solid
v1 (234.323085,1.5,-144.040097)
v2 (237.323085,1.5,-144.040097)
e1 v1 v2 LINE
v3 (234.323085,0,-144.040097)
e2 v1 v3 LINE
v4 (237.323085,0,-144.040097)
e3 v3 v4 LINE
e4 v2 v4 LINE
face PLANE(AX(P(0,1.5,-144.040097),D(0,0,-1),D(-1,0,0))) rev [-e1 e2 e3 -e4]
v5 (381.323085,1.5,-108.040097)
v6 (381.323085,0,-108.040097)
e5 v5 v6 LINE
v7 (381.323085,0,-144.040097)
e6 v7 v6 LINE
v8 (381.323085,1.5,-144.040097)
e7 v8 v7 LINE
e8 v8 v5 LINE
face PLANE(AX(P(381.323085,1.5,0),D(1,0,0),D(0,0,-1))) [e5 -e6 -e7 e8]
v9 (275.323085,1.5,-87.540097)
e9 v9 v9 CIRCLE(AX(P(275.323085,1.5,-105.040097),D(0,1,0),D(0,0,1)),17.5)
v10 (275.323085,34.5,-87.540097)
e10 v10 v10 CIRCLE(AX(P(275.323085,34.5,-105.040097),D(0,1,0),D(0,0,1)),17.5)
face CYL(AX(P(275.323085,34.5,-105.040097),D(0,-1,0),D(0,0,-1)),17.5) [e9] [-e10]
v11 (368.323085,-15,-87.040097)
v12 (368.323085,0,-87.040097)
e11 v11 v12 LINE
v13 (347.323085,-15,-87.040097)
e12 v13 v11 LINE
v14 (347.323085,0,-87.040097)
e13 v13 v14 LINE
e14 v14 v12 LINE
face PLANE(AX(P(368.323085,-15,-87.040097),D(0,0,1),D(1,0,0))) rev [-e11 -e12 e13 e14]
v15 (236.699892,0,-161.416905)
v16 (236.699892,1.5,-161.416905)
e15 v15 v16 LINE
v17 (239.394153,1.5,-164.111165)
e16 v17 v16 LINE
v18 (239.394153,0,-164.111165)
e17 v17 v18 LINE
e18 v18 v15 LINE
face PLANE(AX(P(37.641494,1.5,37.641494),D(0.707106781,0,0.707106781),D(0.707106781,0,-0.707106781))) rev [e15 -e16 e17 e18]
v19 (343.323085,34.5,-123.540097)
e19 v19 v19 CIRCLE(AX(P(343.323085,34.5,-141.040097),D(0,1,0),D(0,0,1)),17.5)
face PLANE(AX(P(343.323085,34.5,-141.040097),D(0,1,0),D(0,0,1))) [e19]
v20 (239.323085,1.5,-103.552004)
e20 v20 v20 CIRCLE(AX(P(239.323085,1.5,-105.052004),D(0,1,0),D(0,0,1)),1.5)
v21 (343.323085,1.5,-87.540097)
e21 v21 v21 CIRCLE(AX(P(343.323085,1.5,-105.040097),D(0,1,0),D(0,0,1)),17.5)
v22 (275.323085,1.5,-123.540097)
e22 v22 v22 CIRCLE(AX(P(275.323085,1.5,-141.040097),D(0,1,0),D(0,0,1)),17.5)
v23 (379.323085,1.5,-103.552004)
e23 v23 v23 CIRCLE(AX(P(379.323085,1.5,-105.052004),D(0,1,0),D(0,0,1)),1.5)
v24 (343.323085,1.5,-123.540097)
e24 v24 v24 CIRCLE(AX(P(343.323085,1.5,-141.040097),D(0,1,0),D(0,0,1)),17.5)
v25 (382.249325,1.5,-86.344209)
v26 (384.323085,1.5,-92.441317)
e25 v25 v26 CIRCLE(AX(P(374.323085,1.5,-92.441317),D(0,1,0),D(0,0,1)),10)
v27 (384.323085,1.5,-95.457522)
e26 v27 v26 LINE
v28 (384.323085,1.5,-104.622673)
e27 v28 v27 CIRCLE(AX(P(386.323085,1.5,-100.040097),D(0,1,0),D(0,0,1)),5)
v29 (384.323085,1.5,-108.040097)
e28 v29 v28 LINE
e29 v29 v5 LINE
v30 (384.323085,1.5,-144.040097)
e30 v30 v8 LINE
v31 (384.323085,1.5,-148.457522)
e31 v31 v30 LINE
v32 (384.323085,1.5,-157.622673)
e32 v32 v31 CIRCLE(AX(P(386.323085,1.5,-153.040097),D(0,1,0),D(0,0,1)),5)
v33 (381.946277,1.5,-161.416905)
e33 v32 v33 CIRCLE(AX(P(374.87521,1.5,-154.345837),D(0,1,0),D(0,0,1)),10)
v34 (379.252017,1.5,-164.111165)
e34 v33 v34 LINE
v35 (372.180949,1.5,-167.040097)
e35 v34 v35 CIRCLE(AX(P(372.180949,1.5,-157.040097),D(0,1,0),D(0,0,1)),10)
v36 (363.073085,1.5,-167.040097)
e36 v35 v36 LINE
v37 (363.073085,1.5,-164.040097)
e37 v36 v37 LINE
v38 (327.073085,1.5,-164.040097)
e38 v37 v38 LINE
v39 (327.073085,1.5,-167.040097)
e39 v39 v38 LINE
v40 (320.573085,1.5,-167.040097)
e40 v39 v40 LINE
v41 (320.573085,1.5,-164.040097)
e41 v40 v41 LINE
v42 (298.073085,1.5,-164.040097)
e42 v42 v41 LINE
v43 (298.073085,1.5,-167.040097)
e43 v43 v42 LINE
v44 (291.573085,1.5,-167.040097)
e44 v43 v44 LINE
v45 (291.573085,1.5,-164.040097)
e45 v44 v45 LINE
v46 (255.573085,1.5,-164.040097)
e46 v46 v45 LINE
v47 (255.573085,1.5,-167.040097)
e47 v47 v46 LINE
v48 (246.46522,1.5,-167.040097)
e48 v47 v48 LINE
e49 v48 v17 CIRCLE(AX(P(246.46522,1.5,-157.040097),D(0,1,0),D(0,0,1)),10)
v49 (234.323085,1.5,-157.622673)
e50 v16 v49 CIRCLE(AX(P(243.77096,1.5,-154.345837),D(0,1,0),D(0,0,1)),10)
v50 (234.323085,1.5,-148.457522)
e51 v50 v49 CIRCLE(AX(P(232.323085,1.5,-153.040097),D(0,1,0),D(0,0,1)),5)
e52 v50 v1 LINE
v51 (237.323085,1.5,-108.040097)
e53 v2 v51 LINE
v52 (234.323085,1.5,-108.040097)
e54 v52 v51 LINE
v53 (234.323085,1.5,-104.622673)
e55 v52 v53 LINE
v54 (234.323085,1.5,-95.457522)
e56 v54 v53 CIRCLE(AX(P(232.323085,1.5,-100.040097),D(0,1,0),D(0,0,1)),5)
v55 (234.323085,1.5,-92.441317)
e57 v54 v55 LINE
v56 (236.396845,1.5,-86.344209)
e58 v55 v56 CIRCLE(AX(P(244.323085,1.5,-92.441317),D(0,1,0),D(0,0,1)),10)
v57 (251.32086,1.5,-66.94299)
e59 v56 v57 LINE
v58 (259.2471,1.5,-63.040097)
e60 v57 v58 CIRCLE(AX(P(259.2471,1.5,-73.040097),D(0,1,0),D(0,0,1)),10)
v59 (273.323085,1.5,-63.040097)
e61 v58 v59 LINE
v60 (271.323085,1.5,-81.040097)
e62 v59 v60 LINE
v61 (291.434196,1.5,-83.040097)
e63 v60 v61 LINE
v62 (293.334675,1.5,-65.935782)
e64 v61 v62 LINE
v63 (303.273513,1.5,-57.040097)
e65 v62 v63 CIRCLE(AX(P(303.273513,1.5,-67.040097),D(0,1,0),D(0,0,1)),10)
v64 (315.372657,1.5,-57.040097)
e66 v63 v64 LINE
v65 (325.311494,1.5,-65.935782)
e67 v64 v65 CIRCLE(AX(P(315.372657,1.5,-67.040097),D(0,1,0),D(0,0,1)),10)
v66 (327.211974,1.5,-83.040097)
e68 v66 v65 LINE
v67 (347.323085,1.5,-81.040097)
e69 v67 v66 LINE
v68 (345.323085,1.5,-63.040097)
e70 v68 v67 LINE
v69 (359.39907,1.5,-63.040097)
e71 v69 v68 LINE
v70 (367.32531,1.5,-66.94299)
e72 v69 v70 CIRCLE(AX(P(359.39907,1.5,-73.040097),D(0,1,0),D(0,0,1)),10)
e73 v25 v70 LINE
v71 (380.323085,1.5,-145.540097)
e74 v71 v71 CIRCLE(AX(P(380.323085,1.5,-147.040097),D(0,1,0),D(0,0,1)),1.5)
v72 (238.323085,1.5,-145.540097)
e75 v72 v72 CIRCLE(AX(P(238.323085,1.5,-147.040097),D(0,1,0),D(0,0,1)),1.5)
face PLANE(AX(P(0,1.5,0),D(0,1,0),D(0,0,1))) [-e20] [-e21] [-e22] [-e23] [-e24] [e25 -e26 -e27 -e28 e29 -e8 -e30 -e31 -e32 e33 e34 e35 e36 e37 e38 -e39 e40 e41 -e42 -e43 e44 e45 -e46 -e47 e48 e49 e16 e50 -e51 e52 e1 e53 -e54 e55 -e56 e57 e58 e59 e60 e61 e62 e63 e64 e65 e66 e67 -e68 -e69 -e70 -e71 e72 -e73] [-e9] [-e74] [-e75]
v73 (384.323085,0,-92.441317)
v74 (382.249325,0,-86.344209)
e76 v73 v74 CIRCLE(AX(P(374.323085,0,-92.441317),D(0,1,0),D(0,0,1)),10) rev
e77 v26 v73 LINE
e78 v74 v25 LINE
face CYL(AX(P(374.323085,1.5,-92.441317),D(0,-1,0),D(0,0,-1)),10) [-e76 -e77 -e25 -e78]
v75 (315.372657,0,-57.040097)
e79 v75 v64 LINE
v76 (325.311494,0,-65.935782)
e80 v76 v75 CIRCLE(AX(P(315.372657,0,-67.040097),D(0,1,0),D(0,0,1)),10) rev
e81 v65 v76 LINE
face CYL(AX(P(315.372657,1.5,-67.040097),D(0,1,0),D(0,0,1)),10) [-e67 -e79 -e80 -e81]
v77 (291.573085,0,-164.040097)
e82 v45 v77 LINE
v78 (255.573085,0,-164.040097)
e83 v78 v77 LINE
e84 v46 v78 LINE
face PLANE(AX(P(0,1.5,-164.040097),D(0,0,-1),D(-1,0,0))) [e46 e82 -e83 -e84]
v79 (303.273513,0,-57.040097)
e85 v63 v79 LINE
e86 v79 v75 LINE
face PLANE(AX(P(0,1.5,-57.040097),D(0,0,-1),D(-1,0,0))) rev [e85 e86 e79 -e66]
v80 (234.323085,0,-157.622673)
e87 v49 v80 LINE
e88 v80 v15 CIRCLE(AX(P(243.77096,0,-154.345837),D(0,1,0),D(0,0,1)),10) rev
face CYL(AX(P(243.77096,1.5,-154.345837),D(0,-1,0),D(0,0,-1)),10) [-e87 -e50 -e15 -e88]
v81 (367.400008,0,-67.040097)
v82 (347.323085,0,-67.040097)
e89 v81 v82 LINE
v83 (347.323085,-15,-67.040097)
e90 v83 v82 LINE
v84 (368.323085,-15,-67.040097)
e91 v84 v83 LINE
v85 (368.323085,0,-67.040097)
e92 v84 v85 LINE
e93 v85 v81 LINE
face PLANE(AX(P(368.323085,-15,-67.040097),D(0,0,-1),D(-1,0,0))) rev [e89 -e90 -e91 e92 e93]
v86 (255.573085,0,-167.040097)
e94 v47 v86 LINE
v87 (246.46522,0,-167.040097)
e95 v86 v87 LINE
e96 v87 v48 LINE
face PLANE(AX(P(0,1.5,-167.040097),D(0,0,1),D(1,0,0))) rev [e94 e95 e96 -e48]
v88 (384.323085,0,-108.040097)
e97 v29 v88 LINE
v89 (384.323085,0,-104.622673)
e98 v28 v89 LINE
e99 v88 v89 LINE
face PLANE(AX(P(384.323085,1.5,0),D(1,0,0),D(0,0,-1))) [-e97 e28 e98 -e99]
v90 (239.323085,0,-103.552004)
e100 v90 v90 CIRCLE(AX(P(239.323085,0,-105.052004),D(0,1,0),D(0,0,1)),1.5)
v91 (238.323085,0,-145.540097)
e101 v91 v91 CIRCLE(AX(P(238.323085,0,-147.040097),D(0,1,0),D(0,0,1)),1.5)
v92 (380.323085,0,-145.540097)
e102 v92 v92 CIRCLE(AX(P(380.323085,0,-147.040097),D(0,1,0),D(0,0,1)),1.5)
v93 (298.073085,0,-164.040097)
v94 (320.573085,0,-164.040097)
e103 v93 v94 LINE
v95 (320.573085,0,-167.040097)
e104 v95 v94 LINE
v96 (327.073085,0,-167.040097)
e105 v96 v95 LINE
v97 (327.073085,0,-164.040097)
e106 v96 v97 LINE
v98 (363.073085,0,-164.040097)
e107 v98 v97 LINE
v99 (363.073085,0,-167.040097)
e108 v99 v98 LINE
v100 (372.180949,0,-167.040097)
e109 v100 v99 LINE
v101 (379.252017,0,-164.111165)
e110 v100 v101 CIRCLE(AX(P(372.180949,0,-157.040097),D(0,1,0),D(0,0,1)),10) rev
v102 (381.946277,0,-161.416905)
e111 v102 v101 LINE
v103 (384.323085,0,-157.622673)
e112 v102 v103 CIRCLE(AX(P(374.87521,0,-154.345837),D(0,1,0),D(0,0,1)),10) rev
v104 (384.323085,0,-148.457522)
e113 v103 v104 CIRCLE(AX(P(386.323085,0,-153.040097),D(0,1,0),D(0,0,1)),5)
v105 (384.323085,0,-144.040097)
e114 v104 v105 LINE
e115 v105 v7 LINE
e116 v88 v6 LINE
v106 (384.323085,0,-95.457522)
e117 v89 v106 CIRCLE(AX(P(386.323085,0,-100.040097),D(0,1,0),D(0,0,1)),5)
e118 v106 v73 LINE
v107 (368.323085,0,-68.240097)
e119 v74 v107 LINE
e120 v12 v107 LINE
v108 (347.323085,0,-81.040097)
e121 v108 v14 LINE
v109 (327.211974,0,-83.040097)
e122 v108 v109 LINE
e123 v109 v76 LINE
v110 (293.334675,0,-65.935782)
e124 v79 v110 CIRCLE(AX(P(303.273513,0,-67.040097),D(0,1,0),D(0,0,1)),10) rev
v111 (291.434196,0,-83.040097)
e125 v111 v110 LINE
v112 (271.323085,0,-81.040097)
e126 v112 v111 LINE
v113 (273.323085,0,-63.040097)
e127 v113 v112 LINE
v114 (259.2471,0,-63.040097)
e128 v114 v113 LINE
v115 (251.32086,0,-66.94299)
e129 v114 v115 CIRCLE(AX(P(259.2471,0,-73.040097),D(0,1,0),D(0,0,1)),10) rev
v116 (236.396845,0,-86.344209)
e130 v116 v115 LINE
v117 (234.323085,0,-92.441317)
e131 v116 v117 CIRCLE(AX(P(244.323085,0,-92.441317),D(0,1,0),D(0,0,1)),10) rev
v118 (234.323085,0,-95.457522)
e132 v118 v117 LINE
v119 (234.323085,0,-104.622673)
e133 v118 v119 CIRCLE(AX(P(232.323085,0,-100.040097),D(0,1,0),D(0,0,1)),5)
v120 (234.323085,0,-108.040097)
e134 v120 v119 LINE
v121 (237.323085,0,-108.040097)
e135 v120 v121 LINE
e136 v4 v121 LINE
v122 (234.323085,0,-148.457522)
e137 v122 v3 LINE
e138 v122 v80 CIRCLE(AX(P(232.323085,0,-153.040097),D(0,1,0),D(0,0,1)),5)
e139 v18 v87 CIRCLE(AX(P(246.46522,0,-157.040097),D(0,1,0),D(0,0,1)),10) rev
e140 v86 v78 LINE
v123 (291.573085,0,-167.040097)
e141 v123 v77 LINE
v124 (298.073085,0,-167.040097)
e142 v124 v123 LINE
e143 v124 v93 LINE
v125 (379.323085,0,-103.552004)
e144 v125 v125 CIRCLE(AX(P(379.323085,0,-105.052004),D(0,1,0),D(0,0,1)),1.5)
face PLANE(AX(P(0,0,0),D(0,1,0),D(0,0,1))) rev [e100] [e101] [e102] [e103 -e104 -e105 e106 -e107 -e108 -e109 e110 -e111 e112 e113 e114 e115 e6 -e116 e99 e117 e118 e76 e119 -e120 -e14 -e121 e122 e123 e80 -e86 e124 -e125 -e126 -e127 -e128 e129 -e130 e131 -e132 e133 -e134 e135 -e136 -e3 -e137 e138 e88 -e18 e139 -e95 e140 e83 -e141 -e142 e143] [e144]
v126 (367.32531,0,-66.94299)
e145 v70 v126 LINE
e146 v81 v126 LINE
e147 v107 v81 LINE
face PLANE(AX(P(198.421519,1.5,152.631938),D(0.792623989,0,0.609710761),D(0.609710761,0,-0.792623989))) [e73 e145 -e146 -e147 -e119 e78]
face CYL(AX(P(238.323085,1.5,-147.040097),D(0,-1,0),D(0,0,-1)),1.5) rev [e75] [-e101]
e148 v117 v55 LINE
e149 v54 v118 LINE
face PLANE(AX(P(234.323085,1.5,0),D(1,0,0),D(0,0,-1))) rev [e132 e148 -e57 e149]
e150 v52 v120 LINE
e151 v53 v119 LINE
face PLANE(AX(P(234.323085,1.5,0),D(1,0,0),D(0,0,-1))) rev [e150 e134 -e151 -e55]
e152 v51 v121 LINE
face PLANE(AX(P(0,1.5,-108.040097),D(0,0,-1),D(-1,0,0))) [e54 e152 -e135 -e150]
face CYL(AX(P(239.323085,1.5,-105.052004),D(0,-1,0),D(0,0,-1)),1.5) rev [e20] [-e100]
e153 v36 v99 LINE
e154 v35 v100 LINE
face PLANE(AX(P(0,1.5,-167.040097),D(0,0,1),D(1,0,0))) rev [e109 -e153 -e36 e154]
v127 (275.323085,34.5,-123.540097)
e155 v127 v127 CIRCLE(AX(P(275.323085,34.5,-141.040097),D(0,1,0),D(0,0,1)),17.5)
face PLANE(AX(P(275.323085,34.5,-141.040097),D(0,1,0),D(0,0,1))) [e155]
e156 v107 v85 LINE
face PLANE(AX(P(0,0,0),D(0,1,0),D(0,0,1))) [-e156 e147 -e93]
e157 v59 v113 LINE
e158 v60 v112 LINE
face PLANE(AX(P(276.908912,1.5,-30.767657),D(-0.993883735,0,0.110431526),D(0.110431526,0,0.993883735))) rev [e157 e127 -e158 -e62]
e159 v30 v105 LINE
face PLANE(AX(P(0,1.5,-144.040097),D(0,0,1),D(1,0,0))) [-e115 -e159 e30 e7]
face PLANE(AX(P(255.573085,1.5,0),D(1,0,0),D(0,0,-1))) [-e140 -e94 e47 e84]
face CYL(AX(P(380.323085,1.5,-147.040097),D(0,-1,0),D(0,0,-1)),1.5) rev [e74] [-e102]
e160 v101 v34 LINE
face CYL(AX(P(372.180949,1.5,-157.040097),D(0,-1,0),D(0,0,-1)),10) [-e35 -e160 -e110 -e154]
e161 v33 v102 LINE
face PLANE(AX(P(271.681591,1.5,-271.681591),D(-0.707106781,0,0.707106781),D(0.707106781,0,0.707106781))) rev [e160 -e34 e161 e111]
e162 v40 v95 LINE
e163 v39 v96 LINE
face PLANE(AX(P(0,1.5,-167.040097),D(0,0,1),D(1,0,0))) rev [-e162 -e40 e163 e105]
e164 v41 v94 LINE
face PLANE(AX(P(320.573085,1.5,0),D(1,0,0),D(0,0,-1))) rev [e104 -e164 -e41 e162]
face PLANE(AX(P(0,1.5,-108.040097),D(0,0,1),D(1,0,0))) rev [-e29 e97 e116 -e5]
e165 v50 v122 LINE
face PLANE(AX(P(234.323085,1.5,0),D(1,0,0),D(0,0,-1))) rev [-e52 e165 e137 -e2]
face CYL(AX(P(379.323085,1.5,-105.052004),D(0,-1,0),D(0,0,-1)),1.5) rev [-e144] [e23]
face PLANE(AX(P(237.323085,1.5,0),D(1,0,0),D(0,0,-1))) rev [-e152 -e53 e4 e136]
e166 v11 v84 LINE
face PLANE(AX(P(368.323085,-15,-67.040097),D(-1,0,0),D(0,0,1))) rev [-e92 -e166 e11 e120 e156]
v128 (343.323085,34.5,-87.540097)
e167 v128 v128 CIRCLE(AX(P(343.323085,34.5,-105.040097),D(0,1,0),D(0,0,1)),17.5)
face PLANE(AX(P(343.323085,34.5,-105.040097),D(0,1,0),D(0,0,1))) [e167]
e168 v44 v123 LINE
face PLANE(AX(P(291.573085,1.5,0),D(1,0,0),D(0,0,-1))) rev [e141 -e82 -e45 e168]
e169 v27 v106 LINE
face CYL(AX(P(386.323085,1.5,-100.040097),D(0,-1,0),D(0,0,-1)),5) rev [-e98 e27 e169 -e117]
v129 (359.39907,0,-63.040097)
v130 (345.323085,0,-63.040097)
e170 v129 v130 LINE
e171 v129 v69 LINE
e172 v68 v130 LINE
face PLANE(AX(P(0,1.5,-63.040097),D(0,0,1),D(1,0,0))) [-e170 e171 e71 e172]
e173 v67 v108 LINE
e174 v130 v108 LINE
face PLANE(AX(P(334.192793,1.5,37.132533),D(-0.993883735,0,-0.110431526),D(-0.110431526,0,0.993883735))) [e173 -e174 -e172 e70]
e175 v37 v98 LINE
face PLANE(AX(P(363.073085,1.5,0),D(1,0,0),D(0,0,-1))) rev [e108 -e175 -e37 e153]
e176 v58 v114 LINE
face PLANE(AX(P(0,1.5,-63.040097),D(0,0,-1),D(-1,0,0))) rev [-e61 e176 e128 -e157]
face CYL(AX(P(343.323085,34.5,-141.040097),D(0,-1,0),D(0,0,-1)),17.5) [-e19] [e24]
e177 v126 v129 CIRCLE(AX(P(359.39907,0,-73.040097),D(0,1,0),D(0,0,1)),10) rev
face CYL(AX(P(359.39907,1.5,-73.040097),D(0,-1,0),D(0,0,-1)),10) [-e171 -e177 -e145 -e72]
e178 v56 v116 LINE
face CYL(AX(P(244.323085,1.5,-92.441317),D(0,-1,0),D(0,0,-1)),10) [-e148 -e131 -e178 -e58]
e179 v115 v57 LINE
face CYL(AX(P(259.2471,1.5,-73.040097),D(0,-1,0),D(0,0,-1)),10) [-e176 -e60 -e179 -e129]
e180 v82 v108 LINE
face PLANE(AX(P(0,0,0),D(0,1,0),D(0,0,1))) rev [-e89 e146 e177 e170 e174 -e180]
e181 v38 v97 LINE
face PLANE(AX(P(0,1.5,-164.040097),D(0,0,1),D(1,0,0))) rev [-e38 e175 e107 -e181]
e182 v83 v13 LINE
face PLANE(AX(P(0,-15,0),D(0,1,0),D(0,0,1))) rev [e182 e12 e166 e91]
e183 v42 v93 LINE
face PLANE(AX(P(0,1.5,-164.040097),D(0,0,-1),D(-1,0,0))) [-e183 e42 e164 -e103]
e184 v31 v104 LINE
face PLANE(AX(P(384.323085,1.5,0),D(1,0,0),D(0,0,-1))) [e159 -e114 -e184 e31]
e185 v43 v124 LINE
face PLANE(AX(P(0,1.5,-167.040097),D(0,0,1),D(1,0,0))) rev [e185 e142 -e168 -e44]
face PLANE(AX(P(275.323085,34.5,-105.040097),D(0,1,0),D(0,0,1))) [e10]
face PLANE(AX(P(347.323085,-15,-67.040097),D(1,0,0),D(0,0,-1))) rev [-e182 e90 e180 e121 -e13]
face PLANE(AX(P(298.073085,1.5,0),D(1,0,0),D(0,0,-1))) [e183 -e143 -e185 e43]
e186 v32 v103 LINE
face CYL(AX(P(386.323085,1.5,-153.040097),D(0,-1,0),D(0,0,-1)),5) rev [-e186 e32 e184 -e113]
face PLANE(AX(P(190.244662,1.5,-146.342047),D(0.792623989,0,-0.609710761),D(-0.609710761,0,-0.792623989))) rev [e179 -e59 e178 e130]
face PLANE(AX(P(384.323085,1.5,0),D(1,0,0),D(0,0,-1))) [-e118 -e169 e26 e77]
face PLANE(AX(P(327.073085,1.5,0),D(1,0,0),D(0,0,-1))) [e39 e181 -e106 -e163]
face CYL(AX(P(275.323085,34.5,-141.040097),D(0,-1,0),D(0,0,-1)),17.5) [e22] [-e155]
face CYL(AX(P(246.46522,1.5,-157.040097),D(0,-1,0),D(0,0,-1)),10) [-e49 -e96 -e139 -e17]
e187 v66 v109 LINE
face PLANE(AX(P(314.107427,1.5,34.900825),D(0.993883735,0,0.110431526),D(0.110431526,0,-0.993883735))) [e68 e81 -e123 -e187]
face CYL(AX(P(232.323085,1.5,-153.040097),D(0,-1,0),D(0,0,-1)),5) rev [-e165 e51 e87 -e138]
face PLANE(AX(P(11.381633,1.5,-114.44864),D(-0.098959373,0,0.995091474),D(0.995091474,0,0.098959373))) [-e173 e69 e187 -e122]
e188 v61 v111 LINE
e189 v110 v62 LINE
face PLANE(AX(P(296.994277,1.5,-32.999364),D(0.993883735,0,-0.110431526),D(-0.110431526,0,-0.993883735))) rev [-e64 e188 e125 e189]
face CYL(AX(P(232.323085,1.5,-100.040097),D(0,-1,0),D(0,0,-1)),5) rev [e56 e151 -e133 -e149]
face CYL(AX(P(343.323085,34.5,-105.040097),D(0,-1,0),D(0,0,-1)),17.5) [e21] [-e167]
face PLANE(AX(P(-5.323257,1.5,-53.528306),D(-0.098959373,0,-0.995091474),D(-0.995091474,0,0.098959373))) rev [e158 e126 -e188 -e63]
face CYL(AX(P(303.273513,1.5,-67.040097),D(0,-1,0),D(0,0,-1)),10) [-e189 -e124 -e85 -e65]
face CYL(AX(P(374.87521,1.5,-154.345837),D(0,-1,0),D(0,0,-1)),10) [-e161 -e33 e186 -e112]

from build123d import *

# Parameters (mm, degrees)
SKETCH_2_R      = 1.5
EXTRUDE_1_DEPTH = 1.5
SKETCH_3_R      = 17.5
EXTRUDE_2_DEPTH = 33
SKETCH_4_W      = 21
SKETCH_4_H      = 20
EXTRUDE_3_DEPTH = 15
FILLET_1_R      = 10


with BuildPart() as part:
    # 草图2 → 凸台-拉伸1 (new body)
    with BuildSketch(Plane(origin=(0, 0, 0), x_dir=(1, 0, 0), z_dir=(0, 1, 0))):
        with BuildLine():
            Line((255.573084798, 167.040097328), (242.323084798, 167.040097328))
            Line((242.323084798, 167.040097328), (234.323084798, 159.040097328))
            Line((234.323084798, 159.040097328), (234.323084798, 157.622673023))
            ThreePointArc((234.323084798, 157.622673023), (236.506384931, 155.778710115), (237.323084798, 153.040097328))
            ThreePointArc((237.323084798, 153.040097328), (236.506384931, 150.30148454), (234.323084798, 148.457521633))
            Line((234.323084798, 148.457521633), (234.323084798, 144.040097328))
            Line((234.323084798, 144.040097328), (237.323084798, 144.040097328))
            Line((237.323084798, 144.040097328), (237.323084798, 108.040097328))
            Line((237.323084798, 108.040097328), (234.323084798, 108.040097328))
            Line((234.323084798, 108.040097328), (234.323084798, 104.622673023))
            ThreePointArc((234.323084798, 104.622673023), (236.506384931, 102.778710115), (237.323084798, 100.040097328))
            ThreePointArc((237.323084798, 100.040097328), (236.506384931, 97.30148454), (234.323084798, 95.457521633))
            Line((234.323084798, 95.457521633), (234.323084798, 89.040097328))
            Line((234.323084798, 89.040097328), (254.323084798, 63.040097328))
            Line((254.323084798, 63.040097328), (273.323084798, 63.040097328))
            Line((273.323084798, 63.040097328), (271.323084798, 81.040097328))
            Line((271.323084798, 81.040097328), (291.434195909, 83.040097328))
            Line((291.434195909, 83.040097328), (294.323084798, 57.040097328))
            Line((294.323084798, 57.040097328), (324.323084798, 57.040097328))
            Line((324.323084798, 57.040097328), (327.211973687, 83.040097328))
            Line((327.211973687, 83.040097328), (347.323084798, 81.040097328))
            Line((347.323084798, 81.040097328), (345.323084798, 63.040097328))
            Line((345.323084798, 63.040097328), (364.323084798, 63.040097328))
            Line((364.323084798, 63.040097328), (384.323084798, 89.040097328))
            Line((384.323084798, 89.040097328), (384.323084798, 95.457521633))
            ThreePointArc((384.323084798, 95.457521633), (381.323084798, 100.040097328), (384.323084798, 104.622673023))
            Line((384.323084798, 104.622673023), (384.323084798, 108.040097328))
            Line((384.323084798, 108.040097328), (381.323084798, 108.040097328))
            Line((381.323084798, 108.040097328), (381.323084798, 144.040097328))
            Line((381.323084798, 144.040097328), (384.323084798, 144.040097328))
            Line((384.323084798, 144.040097328), (384.323084798, 148.457521633))
            ThreePointArc((384.323084798, 148.457521633), (381.323084798, 153.040097328), (384.323084798, 157.622673023))
            Line((384.323084798, 157.622673023), (384.323084798, 159.040097328))
            Line((384.323084798, 159.040097328), (376.323084798, 167.040097328))
            Line((376.323084798, 167.040097328), (363.073084798, 167.040097328))
            Line((363.073084798, 167.040097328), (363.073084798, 164.040097328))
            Line((363.073084798, 164.040097328), (327.073084798, 164.040097328))
            Line((327.073084798, 164.040097328), (327.073084798, 167.040097328))
            Line((327.073084798, 167.040097328), (320.573084798, 167.040097328))
            Line((320.573084798, 167.040097328), (320.573084798, 164.040097328))
            Line((320.573084798, 164.040097328), (298.073084798, 164.040097328))
            Line((298.073084798, 164.040097328), (298.073084798, 167.040097328))
            Line((298.073084798, 167.040097328), (291.573084798, 167.040097328))
            Line((291.573084798, 167.040097328), (291.573084798, 164.040097328))
            Line((291.573084798, 164.040097328), (255.573084798, 164.040097328))
            Line((255.573084798, 164.040097328), (255.573084798, 167.040097328))
        make_face()
        with Locations(Location((239.323084798, 105.052003777, 0), (0, 0, 270))):
            Circle(SKETCH_2_R, mode=Mode.SUBTRACT)
        with Locations(Location((379.323084798, 105.052003777, 0), (0, 0, 270))):
            Circle(SKETCH_2_R, mode=Mode.SUBTRACT)
        with Locations(Location((238.323084798, 147.040097328, 0), (0, 0, 270))):
            Circle(SKETCH_2_R, mode=Mode.SUBTRACT)
        with Locations(Location((380.323084798, 147.040097328, 0), (0, 0, 270))):
            Circle(SKETCH_2_R, mode=Mode.SUBTRACT)
    extrude(amount=EXTRUDE_1_DEPTH)

    # 草图3 → 凸台-拉伸2 (add)
    with BuildSketch(Plane(origin=(0, 1.5, 0), x_dir=(1, 0, 0), z_dir=(0, 1, 0))):
        with Locations(Location((275.323084798, 141.040097328, 0), (0, 0, 270))):
            Circle(SKETCH_3_R)
        with Locations(Location((343.323084798, 141.040097328, 0), (0, 0, 270))):
            Circle(SKETCH_3_R)
        with Locations(Location((275.323084798, 105.040097328, 0), (0, 0, 270))):
            Circle(SKETCH_3_R)
        with Locations(Location((343.323084798, 105.040097328, 0), (0, 0, 270))):
            Circle(SKETCH_3_R)
    extrude(amount=EXTRUDE_2_DEPTH)

    # 草图4 → 凸台-拉伸3 (add)
    with BuildSketch(Plane.XZ):
        with Locations((357.823084798, -77.040097328)):
            Rectangle(SKETCH_4_W, SKETCH_4_H)
    extrude(amount=EXTRUDE_3_DEPTH)

    # 圆角1
    # the kernel refuses this fillet: 10 mm, written as the material it takes off along each edge
    with BuildSketch(Plane(origin=(234.323084798, -8.403282896, -159.040097328), x_dir=(0, 0, 1), z_dir=(0, 1, 0))) as fillet_1_piece_1:
        with BuildLine():
            CenterArc((4.694260484, 9.44787514), FILLET_1_R, 225, 25.871759313)
            Line((-2.376807328, 2.376807328), (-2.518228684, 2.235385972))
            Line((-2.518228684, 2.235385972), (-0.141421356, -0.141421356))
            Line((-0.141421356, -0.141421356), (0, -0.2))
            ThreePointArc((0, -0.2), (0.708712153, -0.2), (1.351887581, -0.188957503))
            Line((1.351887581, -0.188957503), (1.417424305, 0))
        make_face()
    extrude(amount=18.306565791, mode=Mode.SUBTRACT)
    with BuildSketch(Plane(origin=(242.323084798, -10.355339059, -167.040097328), x_dir=(-0.7071067811865476, 0, 0.7071067811865476), z_dir=(0, 1, 0)), Plane(origin=(376.323084798, -10.355339059, -167.040097328), x_dir=(-1, 0, 0), z_dir=(0, 1, 0))) as fillet_1_piece_2:
        with BuildLine():
            CenterArc((FILLET_1_R * 0.414213562373, FILLET_1_R), FILLET_1_R, 225, 45)
            Line((-FILLET_1_R * 0.292893218813, FILLET_1_R * 0.292893218813), (-FILLET_1_R * 0.307035354437, FILLET_1_R * 0.27875108319))
            Line((-FILLET_1_R * 0.307035354437, FILLET_1_R * 0.27875108319), (-FILLET_1_R * 0.00828427124746, -FILLET_1_R * 0.02))
            Line((-FILLET_1_R * 0.00828427124746, -FILLET_1_R * 0.02), (FILLET_1_R * 0.414213562373, -FILLET_1_R * 0.02))
            Line((FILLET_1_R * 0.414213562373, -FILLET_1_R * 0.02), (FILLET_1_R * 0.414213562373, 0))
        make_face()
    extrude(amount=22.210678119, mode=Mode.SUBTRACT)
    with BuildSketch(Plane(origin=(384.323084798, -8.403282896, -159.040097328), x_dir=(-0.7071067811865475, 0, -0.7071067811865475), z_dir=(0, 1, 0))) as fillet_1_piece_3:
        with BuildLine():
            CenterArc((3.361313158, 10), FILLET_1_R, 244.128240687, 25.871759313)
            Line((-1.002270338, 1.002270338), (-1.089542008, 0.822315745))
            ThreePointArc((-1.089542008, 0.822315745), (-0.642556525, 0.359713813), (-0.141421356, -0.141421356))
            Line((-0.141421356, -0.141421356), (0, -0.2))
            Line((0, -0.2), (3.361313158, -0.2))
            Line((3.361313158, -0.2), (3.361313158, 0))
        make_face()
    extrude(amount=18.306565791, mode=Mode.SUBTRACT)
    with BuildSketch(Plane(origin=(384.323084798, -8.503048667, -89.040097328), x_dir=(0, 0, -1), z_dir=(0, 1, 0)), Plane(origin=(234.323084798, -8.503048667, -89.040097328), x_dir=(0.6097107608496891, 0, 0.7926239891046025), z_dir=(0, 1, 0))) as fillet_1_piece_4:
        with BuildLine():
            CenterArc((FILLET_1_R * 0.340121946686, FILLET_1_R), FILLET_1_R, 232.431407971, 37.568592029)
            Line((-FILLET_1_R * 0.269588814164, FILLET_1_R * 0.207376010895), (-FILLET_1_R * 0.281783029381, FILLET_1_R * 0.191523531113))
            Line((-FILLET_1_R * 0.281783029381, FILLET_1_R * 0.191523531113), (-FILLET_1_R * 0.00680243893371, -FILLET_1_R * 0.02))
            Line((-FILLET_1_R * 0.00680243893371, -FILLET_1_R * 0.02), (FILLET_1_R * 0.340121946686, -FILLET_1_R * 0.02))
            Line((FILLET_1_R * 0.340121946686, -FILLET_1_R * 0.02), (FILLET_1_R * 0.340121946686, 0))
        make_face()
    extrude(amount=18.506097334, mode=Mode.SUBTRACT)
    with BuildSketch(Plane(origin=(364.323084798, -12.310037436, -63.040097328), x_dir=(0.6097107608496888, 0, -0.792623989104603), z_dir=(0, 1, 0)), Plane(origin=(254.323084798, -12.310037436, -63.040097328), x_dir=(1, 0, 0), z_dir=(0, 1, 0))) as fillet_1_piece_5:
        with BuildLine():
            CenterArc((FILLET_1_R * 0.492401497451, FILLET_1_R), FILLET_1_R, 217.568592029, 52.431407971)
            Line((-FILLET_1_R * 0.300222491654, FILLET_1_R * 0.39028923915), (-FILLET_1_R * 0.316074971436, FILLET_1_R * 0.378095023933))
            Line((-FILLET_1_R * 0.316074971436, FILLET_1_R * 0.378095023933), (-FILLET_1_R * 0.00984802994901, -FILLET_1_R * 0.02))
            Line((-FILLET_1_R * 0.00984802994901, -FILLET_1_R * 0.02), (FILLET_1_R * 0.492401497451, -FILLET_1_R * 0.02))
            Line((FILLET_1_R * 0.492401497451, -FILLET_1_R * 0.02), (FILLET_1_R * 0.492401497451, 0))
        make_face()
    extrude(amount=26.120074873, mode=Mode.SUBTRACT)
    with BuildSketch(Plane(origin=(324.323084798, -22.376069828, -57.040097328), x_dir=(0.1104315260748475, 0, -0.9938837346736189), z_dir=(0, 1, 0)), Plane(origin=(294.323084798, -22.376069828, -57.040097328), x_dir=(1, 0, 0), z_dir=(0, 1, 0))) as fillet_1_piece_6:
        with BuildLine():
            CenterArc((FILLET_1_R * 0.895042793126, FILLET_1_R), FILLET_1_R, 186.340191746, 83.659808254)
            Line((-FILLET_1_R * 0.0988409415472, FILLET_1_R * 0.889568473925), (-FILLET_1_R * 0.118718616241, FILLET_1_R * 0.887359843404))
            Line((-FILLET_1_R * 0.118718616241, FILLET_1_R * 0.887359843404), (-FILLET_1_R * 0.0179008558625, -FILLET_1_R * 0.02))
            Line((-FILLET_1_R * 0.0179008558625, -FILLET_1_R * 0.02), (FILLET_1_R * 0.895042793126, -FILLET_1_R * 0.02))
            Line((FILLET_1_R * 0.895042793126, -FILLET_1_R * 0.02), (FILLET_1_R * 0.895042793126, 0))
        make_face()
    extrude(amount=46.252139656, mode=Mode.SUBTRACT)


solid = part.part
